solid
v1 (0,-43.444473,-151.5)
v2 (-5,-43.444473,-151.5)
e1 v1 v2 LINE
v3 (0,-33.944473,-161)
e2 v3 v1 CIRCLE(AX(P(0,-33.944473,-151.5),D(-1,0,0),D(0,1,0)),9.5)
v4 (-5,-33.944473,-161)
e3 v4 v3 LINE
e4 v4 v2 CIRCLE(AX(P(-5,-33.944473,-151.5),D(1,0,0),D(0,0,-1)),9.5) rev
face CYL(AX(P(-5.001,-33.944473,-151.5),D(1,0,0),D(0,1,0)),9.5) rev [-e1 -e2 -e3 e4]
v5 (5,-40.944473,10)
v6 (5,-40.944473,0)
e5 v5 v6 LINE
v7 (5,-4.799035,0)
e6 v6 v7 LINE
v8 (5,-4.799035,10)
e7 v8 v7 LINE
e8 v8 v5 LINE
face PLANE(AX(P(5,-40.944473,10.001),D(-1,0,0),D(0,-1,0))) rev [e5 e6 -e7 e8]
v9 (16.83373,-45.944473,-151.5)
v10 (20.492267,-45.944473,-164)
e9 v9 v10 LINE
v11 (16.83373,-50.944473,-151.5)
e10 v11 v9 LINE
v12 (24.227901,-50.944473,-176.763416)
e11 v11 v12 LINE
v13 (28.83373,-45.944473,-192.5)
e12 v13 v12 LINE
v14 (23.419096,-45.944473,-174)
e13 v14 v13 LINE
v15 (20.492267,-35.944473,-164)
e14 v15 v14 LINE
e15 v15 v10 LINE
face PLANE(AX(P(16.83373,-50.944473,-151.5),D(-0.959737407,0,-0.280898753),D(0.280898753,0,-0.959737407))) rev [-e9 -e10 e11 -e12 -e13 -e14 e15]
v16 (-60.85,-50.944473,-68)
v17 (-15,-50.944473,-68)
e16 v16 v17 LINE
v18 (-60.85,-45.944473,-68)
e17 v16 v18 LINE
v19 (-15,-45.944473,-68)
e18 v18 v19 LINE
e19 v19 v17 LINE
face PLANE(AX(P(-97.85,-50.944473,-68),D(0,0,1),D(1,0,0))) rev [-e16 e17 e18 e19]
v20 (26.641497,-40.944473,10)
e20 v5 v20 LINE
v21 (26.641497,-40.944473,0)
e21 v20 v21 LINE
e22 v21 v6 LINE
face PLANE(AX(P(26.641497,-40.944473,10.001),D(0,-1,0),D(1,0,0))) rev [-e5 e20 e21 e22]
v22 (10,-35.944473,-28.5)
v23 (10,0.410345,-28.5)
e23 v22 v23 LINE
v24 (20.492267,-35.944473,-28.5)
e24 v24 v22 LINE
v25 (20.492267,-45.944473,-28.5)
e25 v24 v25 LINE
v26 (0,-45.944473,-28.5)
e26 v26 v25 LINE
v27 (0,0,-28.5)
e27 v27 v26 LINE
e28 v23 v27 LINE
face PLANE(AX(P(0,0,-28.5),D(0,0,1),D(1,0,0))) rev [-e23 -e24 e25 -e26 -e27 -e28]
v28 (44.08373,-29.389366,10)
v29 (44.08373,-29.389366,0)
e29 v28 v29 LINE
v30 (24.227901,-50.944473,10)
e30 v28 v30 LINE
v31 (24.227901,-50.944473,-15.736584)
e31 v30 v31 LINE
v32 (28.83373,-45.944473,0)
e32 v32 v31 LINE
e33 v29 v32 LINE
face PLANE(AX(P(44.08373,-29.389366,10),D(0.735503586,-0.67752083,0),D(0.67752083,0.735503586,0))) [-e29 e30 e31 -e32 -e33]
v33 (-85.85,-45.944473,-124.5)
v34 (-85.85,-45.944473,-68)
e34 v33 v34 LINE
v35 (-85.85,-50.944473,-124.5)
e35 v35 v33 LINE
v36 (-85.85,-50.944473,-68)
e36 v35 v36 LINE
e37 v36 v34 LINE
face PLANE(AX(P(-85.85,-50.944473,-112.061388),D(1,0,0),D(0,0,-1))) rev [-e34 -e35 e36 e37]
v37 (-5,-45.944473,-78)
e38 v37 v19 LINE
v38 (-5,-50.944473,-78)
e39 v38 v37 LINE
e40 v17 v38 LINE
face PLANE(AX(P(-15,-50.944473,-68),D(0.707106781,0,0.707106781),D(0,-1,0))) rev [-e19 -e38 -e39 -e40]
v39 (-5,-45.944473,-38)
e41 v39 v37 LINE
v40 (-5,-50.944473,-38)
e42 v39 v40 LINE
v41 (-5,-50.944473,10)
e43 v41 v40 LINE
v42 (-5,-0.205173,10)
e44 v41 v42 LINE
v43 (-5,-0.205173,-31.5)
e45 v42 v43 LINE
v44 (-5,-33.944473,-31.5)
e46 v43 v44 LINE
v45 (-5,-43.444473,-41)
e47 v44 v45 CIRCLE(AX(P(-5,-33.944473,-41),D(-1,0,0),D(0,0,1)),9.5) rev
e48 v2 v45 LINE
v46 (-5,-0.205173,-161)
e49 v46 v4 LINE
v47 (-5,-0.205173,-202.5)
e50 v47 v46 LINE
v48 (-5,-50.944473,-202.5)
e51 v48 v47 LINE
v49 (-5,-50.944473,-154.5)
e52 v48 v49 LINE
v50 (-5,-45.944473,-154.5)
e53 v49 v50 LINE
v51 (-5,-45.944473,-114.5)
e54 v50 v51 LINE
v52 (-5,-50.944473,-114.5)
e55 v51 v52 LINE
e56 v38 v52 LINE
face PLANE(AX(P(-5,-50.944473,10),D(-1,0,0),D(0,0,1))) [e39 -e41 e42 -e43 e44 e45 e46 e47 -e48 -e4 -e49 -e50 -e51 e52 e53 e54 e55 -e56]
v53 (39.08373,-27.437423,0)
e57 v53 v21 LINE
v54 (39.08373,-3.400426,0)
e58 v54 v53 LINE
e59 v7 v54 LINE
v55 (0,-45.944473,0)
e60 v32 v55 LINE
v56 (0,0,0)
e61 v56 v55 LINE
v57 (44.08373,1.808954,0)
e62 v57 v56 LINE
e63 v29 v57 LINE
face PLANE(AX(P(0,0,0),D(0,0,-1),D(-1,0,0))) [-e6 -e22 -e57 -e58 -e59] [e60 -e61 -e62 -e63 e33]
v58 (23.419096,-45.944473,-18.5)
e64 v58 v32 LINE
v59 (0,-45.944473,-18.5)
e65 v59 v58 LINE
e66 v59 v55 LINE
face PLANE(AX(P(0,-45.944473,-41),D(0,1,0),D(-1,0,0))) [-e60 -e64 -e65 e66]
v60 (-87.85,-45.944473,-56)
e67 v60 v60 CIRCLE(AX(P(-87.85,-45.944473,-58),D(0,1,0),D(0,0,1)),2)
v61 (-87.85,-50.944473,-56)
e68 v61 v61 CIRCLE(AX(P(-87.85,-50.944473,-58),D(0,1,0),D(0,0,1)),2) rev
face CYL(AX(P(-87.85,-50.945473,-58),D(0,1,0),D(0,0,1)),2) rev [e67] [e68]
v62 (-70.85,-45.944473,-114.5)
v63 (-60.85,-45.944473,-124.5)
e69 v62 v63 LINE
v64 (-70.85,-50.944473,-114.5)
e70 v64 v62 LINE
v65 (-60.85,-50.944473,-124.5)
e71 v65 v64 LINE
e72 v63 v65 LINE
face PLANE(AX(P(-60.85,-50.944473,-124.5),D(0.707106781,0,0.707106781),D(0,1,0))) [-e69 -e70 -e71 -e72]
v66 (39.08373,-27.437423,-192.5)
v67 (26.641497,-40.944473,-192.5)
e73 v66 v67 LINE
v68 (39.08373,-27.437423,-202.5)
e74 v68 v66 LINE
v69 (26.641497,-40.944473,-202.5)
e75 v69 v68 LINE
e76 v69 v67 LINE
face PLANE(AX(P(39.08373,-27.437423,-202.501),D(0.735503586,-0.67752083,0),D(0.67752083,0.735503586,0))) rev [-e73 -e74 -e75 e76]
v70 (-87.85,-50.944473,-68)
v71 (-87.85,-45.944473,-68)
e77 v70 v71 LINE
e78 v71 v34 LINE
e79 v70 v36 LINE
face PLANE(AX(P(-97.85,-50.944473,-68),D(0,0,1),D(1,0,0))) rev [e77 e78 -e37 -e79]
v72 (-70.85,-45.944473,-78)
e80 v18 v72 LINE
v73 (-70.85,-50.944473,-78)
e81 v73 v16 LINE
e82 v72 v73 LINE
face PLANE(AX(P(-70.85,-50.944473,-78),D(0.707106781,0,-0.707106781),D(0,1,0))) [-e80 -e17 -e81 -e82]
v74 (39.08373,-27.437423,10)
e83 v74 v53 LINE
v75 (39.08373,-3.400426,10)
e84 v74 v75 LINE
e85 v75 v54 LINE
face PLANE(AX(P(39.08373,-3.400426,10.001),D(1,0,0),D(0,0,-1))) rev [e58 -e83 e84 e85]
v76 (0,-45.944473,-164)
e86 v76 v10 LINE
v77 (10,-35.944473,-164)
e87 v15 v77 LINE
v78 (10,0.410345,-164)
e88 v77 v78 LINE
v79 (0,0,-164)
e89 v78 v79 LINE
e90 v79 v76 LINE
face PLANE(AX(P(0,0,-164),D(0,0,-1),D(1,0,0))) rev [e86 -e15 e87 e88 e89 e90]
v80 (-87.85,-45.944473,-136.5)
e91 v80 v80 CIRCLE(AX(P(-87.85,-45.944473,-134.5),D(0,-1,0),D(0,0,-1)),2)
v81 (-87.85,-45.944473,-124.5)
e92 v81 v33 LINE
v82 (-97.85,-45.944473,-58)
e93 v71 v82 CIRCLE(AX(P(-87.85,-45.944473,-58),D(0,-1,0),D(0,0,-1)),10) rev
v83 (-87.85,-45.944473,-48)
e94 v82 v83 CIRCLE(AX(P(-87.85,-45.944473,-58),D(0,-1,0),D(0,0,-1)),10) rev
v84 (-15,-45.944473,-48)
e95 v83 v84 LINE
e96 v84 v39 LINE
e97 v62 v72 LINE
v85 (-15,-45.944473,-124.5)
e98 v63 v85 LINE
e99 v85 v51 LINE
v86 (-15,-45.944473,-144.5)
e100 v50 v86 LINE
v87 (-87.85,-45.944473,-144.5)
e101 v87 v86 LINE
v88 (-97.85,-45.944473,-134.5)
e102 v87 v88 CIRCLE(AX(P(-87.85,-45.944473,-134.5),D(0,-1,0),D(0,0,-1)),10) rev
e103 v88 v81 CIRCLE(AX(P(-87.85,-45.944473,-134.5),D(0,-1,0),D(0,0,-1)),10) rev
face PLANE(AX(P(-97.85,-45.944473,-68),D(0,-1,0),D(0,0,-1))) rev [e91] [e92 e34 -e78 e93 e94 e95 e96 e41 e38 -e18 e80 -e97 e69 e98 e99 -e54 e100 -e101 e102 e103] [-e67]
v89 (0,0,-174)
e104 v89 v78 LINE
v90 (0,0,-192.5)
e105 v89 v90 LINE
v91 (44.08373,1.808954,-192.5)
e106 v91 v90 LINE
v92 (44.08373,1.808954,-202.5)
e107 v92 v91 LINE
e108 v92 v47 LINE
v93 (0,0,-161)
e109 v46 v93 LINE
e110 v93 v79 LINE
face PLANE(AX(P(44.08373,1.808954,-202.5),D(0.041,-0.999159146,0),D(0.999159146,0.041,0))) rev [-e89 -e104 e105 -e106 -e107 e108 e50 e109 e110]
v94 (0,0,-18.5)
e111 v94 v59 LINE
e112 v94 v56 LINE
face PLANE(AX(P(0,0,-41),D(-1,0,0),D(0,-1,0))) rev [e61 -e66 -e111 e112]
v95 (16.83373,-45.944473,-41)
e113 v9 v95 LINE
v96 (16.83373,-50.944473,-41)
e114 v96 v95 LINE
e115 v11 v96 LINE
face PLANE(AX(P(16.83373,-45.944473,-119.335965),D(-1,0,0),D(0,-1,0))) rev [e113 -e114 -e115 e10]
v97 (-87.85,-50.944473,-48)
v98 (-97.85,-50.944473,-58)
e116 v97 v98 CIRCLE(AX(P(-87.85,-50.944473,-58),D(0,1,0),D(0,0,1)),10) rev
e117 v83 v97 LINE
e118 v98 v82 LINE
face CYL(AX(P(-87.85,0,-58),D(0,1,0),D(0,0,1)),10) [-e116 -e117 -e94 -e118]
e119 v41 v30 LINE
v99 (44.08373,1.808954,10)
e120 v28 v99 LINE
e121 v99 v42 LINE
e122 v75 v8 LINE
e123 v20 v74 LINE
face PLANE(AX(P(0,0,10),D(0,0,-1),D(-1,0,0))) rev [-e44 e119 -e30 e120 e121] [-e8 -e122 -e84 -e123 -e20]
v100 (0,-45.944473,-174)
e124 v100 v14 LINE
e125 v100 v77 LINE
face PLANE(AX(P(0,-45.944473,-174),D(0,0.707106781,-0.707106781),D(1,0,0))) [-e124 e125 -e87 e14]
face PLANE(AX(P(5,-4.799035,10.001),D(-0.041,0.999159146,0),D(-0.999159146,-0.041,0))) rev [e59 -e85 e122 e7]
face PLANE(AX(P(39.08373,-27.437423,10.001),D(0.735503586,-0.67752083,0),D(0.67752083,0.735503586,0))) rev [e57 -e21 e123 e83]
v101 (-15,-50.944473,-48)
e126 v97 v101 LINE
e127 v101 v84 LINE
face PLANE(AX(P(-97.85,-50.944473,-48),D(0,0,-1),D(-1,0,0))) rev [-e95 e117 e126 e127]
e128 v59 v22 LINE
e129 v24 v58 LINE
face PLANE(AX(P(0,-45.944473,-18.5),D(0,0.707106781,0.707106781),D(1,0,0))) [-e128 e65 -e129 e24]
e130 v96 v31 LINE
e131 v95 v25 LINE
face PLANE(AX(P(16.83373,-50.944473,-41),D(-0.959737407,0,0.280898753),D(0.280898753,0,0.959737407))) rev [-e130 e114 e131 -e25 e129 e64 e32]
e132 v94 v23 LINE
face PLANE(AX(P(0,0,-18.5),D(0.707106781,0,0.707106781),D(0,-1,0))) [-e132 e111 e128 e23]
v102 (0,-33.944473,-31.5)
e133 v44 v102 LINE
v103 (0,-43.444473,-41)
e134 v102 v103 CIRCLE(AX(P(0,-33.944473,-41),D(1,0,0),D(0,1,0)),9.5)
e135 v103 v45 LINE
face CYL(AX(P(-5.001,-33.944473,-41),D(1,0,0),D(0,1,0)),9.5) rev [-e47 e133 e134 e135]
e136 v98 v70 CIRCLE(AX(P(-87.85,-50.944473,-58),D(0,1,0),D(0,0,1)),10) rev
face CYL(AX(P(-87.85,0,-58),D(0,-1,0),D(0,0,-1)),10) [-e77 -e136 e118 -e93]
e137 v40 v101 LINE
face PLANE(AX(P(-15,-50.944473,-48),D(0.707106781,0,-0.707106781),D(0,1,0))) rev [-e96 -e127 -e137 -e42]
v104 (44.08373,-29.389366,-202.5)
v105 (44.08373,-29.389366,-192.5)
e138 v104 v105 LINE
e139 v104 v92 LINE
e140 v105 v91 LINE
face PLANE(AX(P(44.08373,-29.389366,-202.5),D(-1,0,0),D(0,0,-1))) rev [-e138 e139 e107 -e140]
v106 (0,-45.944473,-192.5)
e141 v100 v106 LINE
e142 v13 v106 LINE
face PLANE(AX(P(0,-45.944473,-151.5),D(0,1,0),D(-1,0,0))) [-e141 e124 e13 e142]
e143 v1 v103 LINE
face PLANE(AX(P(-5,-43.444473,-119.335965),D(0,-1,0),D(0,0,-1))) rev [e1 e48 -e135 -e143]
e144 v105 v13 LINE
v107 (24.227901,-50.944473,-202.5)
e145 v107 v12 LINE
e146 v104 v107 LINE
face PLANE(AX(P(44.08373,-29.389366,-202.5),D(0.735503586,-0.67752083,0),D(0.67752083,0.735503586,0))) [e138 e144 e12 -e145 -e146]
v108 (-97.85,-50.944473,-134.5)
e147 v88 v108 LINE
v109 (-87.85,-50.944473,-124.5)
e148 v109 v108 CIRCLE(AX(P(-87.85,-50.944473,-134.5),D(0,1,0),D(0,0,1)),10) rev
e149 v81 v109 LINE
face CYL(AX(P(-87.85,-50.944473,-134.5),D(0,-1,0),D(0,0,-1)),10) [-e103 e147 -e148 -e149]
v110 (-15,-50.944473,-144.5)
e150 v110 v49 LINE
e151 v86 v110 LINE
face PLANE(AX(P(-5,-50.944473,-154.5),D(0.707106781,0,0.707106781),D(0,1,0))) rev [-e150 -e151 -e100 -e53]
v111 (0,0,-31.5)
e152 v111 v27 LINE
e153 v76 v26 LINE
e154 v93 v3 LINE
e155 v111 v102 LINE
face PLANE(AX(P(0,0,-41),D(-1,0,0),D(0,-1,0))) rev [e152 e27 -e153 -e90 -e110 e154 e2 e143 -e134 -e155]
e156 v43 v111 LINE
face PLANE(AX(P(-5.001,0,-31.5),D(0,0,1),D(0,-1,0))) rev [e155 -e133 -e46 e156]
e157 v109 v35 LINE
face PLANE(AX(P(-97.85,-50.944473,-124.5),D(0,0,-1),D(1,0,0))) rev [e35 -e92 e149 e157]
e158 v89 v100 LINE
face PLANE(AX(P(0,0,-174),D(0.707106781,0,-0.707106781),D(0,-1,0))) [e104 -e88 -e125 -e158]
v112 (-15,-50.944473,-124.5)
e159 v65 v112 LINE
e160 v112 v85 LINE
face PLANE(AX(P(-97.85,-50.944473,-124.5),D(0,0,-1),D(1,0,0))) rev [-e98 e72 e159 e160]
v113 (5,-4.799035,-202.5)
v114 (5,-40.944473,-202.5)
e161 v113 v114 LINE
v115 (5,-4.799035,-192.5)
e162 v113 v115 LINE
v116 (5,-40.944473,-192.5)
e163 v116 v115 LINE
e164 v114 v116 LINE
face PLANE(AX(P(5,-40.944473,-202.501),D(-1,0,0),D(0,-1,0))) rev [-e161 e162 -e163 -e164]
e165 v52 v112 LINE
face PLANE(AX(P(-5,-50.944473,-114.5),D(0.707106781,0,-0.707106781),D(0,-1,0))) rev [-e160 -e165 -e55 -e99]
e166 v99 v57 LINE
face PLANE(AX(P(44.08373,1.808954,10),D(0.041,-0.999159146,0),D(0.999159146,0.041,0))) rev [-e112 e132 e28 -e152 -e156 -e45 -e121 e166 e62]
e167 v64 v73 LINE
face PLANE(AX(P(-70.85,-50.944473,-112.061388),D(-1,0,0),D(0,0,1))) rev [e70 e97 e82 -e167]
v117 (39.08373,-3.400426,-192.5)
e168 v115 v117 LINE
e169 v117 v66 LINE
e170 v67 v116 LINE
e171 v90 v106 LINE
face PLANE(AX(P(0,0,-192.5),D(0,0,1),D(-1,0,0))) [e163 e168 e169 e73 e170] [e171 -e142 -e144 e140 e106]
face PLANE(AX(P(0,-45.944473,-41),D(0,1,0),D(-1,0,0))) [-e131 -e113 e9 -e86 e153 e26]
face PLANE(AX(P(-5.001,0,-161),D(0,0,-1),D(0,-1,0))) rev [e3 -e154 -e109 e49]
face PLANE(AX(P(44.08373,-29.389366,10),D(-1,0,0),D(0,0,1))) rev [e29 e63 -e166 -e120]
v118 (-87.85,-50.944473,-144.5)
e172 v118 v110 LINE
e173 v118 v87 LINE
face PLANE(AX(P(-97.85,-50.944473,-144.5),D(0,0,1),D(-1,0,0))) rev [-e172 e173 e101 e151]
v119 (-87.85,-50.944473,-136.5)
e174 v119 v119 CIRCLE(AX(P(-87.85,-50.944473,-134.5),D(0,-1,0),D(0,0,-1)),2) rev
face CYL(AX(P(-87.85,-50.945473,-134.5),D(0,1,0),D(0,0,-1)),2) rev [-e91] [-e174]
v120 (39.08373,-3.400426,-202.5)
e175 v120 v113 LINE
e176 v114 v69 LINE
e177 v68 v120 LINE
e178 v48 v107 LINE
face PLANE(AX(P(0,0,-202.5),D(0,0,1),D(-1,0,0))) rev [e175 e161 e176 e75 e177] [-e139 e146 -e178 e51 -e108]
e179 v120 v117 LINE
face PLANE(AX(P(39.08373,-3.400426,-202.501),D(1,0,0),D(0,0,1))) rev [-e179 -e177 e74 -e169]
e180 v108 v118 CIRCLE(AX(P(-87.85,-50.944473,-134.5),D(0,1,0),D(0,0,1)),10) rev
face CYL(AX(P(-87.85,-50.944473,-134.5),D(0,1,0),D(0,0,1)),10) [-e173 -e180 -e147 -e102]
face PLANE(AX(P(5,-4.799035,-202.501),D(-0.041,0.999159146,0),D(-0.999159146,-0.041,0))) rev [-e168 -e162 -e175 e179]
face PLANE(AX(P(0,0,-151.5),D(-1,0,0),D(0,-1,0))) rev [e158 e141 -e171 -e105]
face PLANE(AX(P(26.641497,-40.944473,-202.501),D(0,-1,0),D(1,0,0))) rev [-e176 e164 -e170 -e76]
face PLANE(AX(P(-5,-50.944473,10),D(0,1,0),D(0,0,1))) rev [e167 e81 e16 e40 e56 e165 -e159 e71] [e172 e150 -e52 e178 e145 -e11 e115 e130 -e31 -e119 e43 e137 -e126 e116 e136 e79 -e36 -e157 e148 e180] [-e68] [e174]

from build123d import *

# Parameters (mm, degrees)
BOSS_EXTRUDE1_DEPTH     = 10
BOSS_EXTRUDE6_DEPTH     = 41
CUT_EXTRUDE1_REACH      = 80.865
CUT_EXTRUDE2_REACH      = 80.865
BOSS_EXTRUDE9_DEPTH     = 10
CHAMFER3_SIZE           = 10
CUT_EXTRUDE3_DEPTH      = 77.842469388
CUT_EXTRUDE3_DEPTH_BACK = 77.842469388
BOSS_EXTRUDE10_DEPTH    = 55.25
SKETCH13_W              = 20
SKETCH13_H              = 5
BOSS_EXTRUDE11_DEPTH    = 92.85
CUT_EXTRUDE4_REACH      = 147.324
SKETCH14_R              = 2
SKETCH15_W              = 15
SKETCH15_H              = 5
BOSS_EXTRUDE12_DEPTH    = 28.25
FILLET1_R               = 10
CHAMFER4_SIZE           = 10


with BuildPart() as part:
    # Sketch2 → Boss-Extrude1 (new body)
    with BuildSketch(Plane.XY):
        Polygon((-5, -50.944473192), (-5, -0.20517252), (44.083730464, 1.808954014), (44.083730464, -29.38936641), (24.227900916, -50.944473192), align=None)
    extrude(amount=BOSS_EXTRUDE1_DEPTH)

    # Sketch2<5> → Boss-Extrude6 (add)
    with BuildSketch(Plane.XY):
        Polygon((-5, -0.20517252), (-5, -50.944473192), (24.227900916, -50.944473192), (28.833730464, -45.944473192), (0, -45.944473192), (0, 0), align=None)
    extrude(amount=-BOSS_EXTRUDE6_DEPTH)

    # Sketch6 → Cut-Extrude1 (cut, up to next)
    with BuildSketch(Plane(origin=(0, 0, 0), x_dir=(0, 0, -1), z_dir=(1, 0, 0)), mode=Mode.PRIVATE) as cut_extrude1_sk1:
        with BuildLine():
            Line((31.5, 0), (31.5, -33.944473192))
            ThreePointArc((31.5, -33.944473192), (47.717514421, -40.661987613), (41, -24.444473192))
            Line((41, -24.444473192), (41, 0))
            Line((41, 0), (31.5, 0))
        make_face()
    cut_extrude1_tool1 = extrude(cut_extrude1_sk1.sketch, amount=-CUT_EXTRUDE1_REACH, mode=Mode.PRIVATE) & part.part
    add(cut_extrude1_tool1.solids().sort_by_distance((0, -24.250765, -38.671635))[0], mode=Mode.SUBTRACT)

    # Sketch7 → Cut-Extrude2 (cut, up to next)
    with BuildSketch(Plane(origin=(0, 0, 0), x_dir=(-1, 0, 0), z_dir=(0, 0, -1)), mode=Mode.PRIVATE) as cut_extrude2_sk1:
        Polygon((-5, -4.799035286), (-39.083730464, -3.400426311), (-39.083730464, -27.437423368), (-26.641496625, -40.944473192), (-5, -40.944473192), align=None)
    cut_extrude2_tool1 = extrude(cut_extrude2_sk1.sketch, amount=-CUT_EXTRUDE2_REACH, mode=Mode.PRIVATE) & part.part
    add(cut_extrude2_tool1.solids().sort_by_distance((21.232744, -21.521517, 0))[0], mode=Mode.SUBTRACT)

    # Sketch10 → Boss-Extrude9 (add)
    with BuildSketch(Plane.XY.offset(-28.5)):
        Polygon((28.833730464, -45.944473192), (0, -45.944473192), (0, 0), (10, 0.41034504), (10, -35.944473192), (28.833730464, -35.944473192), align=None)
    extrude(amount=BOSS_EXTRUDE9_DEPTH)

    # Chamfer3
    chamfer3_edges = [part.edges().sort_by_distance(p)[0] for p in [
        (19.416865232, -35.944473192, -18.5),
        (10, -17.767064076, -18.5),
    ]]
    chamfer(chamfer3_edges, length=CHAMFER3_SIZE - 0.0001)  # a hair under: the kernel refuses the full size

    # Sketch11 → Cut-Extrude3 (cut, two sides: drawn at the far end of the back side and taken through both)
    with BuildSketch(Plane(origin=(0, -45.944473192, 0), x_dir=(1, 0, 0), z_dir=(0, 1, 0)).offset(-CUT_EXTRUDE3_DEPTH_BACK)):
        Polygon((28.833730464, 41), (16.833730464, 41), (28.833730464, 0), align=None)
    extrude(amount=CUT_EXTRUDE3_DEPTH + CUT_EXTRUDE3_DEPTH_BACK, mode=Mode.SUBTRACT)

    # Sketch12 → Boss-Extrude10 (add)
    with BuildSketch(Plane(origin=(0, 0, -41), x_dir=(-1, 0, 0), z_dir=(0, 0, -1))):
        Polygon((0, -45.944473192), (-16.833730464, -45.944473192), (-16.833730464, -50.944473192), (5, -50.944473192), (5, -43.444473192), (0, -43.444473192), align=None)
    extrude(amount=BOSS_EXTRUDE10_DEPTH)

    # Sketch13 → Boss-Extrude11 (add)
    with BuildSketch(Plane.ZY.offset(5)):
        with Locations((-58, -48.444473192)):
            Rectangle(SKETCH13_W, SKETCH13_H)
    extrude(amount=BOSS_EXTRUDE11_DEPTH)

    # Sketch14 → Cut-Extrude4 (cut, up to next)
    with BuildSketch(Plane(origin=(0, -45.944473192, 0), x_dir=(1, 0, 0), z_dir=(0, 1, 0)), mode=Mode.PRIVATE) as cut_extrude4_sk1:
        with Locations(Location((-87.85, 58, 0), (0, 0, 270))):
            Circle(SKETCH14_R)
    cut_extrude4_tool1 = extrude(cut_extrude4_sk1.sketch, amount=-CUT_EXTRUDE4_REACH, mode=Mode.PRIVATE) & part.part
    add(cut_extrude4_tool1.solids().sort_by_distance((-87.85, -45.944473, -58))[0], mode=Mode.SUBTRACT)

    # Sketch15 → Boss-Extrude12 (add)
    with BuildSketch(Plane(origin=(0, 0, -68), x_dir=(-1, 0, 0), z_dir=(0, 0, -1))):
        with Locations((78.35, -48.444473192)):
            Rectangle(SKETCH15_W, SKETCH15_H)
    extrude(amount=BOSS_EXTRUDE12_DEPTH)

    # Mirror1: part across plane


with BuildPart() as part_1:
    add(part.part)
    add(part.part.mirror(Plane(origin=(0, 0, -96.25), x_dir=(1, 0, 0), z_dir=(0, 0, -1))))

    # Fillet1
    fillet1_edges = [part_1.edges().sort_by_distance(p)[0] for p in [
        (-97.85, -48.444473192, -144.5),
        (-97.85, -48.444473192, -48),
        (-97.85, -48.444473192, -124.5),
        (-97.85, -48.444473192, -68),
    ]]
    fillet(fillet1_edges, radius=FILLET1_R - 0.0001)  # a hair under: the kernel refuses the full size

    # Chamfer4
    chamfer4_edges = [part_1.edges().sort_by_distance(p)[0] for p in [
        (-5, -48.444473192, -68),
        (-5, -48.444473192, -48),
        (-70.85, -48.444473192, -68),
        (-70.85, -48.444473192, -124.5),
        (-5, -48.444473192, -124.5),
        (-5, -48.444473192, -144.5),
    ]]
    chamfer(chamfer4_edges, length=CHAMFER4_SIZE)


solid = part_1.part
